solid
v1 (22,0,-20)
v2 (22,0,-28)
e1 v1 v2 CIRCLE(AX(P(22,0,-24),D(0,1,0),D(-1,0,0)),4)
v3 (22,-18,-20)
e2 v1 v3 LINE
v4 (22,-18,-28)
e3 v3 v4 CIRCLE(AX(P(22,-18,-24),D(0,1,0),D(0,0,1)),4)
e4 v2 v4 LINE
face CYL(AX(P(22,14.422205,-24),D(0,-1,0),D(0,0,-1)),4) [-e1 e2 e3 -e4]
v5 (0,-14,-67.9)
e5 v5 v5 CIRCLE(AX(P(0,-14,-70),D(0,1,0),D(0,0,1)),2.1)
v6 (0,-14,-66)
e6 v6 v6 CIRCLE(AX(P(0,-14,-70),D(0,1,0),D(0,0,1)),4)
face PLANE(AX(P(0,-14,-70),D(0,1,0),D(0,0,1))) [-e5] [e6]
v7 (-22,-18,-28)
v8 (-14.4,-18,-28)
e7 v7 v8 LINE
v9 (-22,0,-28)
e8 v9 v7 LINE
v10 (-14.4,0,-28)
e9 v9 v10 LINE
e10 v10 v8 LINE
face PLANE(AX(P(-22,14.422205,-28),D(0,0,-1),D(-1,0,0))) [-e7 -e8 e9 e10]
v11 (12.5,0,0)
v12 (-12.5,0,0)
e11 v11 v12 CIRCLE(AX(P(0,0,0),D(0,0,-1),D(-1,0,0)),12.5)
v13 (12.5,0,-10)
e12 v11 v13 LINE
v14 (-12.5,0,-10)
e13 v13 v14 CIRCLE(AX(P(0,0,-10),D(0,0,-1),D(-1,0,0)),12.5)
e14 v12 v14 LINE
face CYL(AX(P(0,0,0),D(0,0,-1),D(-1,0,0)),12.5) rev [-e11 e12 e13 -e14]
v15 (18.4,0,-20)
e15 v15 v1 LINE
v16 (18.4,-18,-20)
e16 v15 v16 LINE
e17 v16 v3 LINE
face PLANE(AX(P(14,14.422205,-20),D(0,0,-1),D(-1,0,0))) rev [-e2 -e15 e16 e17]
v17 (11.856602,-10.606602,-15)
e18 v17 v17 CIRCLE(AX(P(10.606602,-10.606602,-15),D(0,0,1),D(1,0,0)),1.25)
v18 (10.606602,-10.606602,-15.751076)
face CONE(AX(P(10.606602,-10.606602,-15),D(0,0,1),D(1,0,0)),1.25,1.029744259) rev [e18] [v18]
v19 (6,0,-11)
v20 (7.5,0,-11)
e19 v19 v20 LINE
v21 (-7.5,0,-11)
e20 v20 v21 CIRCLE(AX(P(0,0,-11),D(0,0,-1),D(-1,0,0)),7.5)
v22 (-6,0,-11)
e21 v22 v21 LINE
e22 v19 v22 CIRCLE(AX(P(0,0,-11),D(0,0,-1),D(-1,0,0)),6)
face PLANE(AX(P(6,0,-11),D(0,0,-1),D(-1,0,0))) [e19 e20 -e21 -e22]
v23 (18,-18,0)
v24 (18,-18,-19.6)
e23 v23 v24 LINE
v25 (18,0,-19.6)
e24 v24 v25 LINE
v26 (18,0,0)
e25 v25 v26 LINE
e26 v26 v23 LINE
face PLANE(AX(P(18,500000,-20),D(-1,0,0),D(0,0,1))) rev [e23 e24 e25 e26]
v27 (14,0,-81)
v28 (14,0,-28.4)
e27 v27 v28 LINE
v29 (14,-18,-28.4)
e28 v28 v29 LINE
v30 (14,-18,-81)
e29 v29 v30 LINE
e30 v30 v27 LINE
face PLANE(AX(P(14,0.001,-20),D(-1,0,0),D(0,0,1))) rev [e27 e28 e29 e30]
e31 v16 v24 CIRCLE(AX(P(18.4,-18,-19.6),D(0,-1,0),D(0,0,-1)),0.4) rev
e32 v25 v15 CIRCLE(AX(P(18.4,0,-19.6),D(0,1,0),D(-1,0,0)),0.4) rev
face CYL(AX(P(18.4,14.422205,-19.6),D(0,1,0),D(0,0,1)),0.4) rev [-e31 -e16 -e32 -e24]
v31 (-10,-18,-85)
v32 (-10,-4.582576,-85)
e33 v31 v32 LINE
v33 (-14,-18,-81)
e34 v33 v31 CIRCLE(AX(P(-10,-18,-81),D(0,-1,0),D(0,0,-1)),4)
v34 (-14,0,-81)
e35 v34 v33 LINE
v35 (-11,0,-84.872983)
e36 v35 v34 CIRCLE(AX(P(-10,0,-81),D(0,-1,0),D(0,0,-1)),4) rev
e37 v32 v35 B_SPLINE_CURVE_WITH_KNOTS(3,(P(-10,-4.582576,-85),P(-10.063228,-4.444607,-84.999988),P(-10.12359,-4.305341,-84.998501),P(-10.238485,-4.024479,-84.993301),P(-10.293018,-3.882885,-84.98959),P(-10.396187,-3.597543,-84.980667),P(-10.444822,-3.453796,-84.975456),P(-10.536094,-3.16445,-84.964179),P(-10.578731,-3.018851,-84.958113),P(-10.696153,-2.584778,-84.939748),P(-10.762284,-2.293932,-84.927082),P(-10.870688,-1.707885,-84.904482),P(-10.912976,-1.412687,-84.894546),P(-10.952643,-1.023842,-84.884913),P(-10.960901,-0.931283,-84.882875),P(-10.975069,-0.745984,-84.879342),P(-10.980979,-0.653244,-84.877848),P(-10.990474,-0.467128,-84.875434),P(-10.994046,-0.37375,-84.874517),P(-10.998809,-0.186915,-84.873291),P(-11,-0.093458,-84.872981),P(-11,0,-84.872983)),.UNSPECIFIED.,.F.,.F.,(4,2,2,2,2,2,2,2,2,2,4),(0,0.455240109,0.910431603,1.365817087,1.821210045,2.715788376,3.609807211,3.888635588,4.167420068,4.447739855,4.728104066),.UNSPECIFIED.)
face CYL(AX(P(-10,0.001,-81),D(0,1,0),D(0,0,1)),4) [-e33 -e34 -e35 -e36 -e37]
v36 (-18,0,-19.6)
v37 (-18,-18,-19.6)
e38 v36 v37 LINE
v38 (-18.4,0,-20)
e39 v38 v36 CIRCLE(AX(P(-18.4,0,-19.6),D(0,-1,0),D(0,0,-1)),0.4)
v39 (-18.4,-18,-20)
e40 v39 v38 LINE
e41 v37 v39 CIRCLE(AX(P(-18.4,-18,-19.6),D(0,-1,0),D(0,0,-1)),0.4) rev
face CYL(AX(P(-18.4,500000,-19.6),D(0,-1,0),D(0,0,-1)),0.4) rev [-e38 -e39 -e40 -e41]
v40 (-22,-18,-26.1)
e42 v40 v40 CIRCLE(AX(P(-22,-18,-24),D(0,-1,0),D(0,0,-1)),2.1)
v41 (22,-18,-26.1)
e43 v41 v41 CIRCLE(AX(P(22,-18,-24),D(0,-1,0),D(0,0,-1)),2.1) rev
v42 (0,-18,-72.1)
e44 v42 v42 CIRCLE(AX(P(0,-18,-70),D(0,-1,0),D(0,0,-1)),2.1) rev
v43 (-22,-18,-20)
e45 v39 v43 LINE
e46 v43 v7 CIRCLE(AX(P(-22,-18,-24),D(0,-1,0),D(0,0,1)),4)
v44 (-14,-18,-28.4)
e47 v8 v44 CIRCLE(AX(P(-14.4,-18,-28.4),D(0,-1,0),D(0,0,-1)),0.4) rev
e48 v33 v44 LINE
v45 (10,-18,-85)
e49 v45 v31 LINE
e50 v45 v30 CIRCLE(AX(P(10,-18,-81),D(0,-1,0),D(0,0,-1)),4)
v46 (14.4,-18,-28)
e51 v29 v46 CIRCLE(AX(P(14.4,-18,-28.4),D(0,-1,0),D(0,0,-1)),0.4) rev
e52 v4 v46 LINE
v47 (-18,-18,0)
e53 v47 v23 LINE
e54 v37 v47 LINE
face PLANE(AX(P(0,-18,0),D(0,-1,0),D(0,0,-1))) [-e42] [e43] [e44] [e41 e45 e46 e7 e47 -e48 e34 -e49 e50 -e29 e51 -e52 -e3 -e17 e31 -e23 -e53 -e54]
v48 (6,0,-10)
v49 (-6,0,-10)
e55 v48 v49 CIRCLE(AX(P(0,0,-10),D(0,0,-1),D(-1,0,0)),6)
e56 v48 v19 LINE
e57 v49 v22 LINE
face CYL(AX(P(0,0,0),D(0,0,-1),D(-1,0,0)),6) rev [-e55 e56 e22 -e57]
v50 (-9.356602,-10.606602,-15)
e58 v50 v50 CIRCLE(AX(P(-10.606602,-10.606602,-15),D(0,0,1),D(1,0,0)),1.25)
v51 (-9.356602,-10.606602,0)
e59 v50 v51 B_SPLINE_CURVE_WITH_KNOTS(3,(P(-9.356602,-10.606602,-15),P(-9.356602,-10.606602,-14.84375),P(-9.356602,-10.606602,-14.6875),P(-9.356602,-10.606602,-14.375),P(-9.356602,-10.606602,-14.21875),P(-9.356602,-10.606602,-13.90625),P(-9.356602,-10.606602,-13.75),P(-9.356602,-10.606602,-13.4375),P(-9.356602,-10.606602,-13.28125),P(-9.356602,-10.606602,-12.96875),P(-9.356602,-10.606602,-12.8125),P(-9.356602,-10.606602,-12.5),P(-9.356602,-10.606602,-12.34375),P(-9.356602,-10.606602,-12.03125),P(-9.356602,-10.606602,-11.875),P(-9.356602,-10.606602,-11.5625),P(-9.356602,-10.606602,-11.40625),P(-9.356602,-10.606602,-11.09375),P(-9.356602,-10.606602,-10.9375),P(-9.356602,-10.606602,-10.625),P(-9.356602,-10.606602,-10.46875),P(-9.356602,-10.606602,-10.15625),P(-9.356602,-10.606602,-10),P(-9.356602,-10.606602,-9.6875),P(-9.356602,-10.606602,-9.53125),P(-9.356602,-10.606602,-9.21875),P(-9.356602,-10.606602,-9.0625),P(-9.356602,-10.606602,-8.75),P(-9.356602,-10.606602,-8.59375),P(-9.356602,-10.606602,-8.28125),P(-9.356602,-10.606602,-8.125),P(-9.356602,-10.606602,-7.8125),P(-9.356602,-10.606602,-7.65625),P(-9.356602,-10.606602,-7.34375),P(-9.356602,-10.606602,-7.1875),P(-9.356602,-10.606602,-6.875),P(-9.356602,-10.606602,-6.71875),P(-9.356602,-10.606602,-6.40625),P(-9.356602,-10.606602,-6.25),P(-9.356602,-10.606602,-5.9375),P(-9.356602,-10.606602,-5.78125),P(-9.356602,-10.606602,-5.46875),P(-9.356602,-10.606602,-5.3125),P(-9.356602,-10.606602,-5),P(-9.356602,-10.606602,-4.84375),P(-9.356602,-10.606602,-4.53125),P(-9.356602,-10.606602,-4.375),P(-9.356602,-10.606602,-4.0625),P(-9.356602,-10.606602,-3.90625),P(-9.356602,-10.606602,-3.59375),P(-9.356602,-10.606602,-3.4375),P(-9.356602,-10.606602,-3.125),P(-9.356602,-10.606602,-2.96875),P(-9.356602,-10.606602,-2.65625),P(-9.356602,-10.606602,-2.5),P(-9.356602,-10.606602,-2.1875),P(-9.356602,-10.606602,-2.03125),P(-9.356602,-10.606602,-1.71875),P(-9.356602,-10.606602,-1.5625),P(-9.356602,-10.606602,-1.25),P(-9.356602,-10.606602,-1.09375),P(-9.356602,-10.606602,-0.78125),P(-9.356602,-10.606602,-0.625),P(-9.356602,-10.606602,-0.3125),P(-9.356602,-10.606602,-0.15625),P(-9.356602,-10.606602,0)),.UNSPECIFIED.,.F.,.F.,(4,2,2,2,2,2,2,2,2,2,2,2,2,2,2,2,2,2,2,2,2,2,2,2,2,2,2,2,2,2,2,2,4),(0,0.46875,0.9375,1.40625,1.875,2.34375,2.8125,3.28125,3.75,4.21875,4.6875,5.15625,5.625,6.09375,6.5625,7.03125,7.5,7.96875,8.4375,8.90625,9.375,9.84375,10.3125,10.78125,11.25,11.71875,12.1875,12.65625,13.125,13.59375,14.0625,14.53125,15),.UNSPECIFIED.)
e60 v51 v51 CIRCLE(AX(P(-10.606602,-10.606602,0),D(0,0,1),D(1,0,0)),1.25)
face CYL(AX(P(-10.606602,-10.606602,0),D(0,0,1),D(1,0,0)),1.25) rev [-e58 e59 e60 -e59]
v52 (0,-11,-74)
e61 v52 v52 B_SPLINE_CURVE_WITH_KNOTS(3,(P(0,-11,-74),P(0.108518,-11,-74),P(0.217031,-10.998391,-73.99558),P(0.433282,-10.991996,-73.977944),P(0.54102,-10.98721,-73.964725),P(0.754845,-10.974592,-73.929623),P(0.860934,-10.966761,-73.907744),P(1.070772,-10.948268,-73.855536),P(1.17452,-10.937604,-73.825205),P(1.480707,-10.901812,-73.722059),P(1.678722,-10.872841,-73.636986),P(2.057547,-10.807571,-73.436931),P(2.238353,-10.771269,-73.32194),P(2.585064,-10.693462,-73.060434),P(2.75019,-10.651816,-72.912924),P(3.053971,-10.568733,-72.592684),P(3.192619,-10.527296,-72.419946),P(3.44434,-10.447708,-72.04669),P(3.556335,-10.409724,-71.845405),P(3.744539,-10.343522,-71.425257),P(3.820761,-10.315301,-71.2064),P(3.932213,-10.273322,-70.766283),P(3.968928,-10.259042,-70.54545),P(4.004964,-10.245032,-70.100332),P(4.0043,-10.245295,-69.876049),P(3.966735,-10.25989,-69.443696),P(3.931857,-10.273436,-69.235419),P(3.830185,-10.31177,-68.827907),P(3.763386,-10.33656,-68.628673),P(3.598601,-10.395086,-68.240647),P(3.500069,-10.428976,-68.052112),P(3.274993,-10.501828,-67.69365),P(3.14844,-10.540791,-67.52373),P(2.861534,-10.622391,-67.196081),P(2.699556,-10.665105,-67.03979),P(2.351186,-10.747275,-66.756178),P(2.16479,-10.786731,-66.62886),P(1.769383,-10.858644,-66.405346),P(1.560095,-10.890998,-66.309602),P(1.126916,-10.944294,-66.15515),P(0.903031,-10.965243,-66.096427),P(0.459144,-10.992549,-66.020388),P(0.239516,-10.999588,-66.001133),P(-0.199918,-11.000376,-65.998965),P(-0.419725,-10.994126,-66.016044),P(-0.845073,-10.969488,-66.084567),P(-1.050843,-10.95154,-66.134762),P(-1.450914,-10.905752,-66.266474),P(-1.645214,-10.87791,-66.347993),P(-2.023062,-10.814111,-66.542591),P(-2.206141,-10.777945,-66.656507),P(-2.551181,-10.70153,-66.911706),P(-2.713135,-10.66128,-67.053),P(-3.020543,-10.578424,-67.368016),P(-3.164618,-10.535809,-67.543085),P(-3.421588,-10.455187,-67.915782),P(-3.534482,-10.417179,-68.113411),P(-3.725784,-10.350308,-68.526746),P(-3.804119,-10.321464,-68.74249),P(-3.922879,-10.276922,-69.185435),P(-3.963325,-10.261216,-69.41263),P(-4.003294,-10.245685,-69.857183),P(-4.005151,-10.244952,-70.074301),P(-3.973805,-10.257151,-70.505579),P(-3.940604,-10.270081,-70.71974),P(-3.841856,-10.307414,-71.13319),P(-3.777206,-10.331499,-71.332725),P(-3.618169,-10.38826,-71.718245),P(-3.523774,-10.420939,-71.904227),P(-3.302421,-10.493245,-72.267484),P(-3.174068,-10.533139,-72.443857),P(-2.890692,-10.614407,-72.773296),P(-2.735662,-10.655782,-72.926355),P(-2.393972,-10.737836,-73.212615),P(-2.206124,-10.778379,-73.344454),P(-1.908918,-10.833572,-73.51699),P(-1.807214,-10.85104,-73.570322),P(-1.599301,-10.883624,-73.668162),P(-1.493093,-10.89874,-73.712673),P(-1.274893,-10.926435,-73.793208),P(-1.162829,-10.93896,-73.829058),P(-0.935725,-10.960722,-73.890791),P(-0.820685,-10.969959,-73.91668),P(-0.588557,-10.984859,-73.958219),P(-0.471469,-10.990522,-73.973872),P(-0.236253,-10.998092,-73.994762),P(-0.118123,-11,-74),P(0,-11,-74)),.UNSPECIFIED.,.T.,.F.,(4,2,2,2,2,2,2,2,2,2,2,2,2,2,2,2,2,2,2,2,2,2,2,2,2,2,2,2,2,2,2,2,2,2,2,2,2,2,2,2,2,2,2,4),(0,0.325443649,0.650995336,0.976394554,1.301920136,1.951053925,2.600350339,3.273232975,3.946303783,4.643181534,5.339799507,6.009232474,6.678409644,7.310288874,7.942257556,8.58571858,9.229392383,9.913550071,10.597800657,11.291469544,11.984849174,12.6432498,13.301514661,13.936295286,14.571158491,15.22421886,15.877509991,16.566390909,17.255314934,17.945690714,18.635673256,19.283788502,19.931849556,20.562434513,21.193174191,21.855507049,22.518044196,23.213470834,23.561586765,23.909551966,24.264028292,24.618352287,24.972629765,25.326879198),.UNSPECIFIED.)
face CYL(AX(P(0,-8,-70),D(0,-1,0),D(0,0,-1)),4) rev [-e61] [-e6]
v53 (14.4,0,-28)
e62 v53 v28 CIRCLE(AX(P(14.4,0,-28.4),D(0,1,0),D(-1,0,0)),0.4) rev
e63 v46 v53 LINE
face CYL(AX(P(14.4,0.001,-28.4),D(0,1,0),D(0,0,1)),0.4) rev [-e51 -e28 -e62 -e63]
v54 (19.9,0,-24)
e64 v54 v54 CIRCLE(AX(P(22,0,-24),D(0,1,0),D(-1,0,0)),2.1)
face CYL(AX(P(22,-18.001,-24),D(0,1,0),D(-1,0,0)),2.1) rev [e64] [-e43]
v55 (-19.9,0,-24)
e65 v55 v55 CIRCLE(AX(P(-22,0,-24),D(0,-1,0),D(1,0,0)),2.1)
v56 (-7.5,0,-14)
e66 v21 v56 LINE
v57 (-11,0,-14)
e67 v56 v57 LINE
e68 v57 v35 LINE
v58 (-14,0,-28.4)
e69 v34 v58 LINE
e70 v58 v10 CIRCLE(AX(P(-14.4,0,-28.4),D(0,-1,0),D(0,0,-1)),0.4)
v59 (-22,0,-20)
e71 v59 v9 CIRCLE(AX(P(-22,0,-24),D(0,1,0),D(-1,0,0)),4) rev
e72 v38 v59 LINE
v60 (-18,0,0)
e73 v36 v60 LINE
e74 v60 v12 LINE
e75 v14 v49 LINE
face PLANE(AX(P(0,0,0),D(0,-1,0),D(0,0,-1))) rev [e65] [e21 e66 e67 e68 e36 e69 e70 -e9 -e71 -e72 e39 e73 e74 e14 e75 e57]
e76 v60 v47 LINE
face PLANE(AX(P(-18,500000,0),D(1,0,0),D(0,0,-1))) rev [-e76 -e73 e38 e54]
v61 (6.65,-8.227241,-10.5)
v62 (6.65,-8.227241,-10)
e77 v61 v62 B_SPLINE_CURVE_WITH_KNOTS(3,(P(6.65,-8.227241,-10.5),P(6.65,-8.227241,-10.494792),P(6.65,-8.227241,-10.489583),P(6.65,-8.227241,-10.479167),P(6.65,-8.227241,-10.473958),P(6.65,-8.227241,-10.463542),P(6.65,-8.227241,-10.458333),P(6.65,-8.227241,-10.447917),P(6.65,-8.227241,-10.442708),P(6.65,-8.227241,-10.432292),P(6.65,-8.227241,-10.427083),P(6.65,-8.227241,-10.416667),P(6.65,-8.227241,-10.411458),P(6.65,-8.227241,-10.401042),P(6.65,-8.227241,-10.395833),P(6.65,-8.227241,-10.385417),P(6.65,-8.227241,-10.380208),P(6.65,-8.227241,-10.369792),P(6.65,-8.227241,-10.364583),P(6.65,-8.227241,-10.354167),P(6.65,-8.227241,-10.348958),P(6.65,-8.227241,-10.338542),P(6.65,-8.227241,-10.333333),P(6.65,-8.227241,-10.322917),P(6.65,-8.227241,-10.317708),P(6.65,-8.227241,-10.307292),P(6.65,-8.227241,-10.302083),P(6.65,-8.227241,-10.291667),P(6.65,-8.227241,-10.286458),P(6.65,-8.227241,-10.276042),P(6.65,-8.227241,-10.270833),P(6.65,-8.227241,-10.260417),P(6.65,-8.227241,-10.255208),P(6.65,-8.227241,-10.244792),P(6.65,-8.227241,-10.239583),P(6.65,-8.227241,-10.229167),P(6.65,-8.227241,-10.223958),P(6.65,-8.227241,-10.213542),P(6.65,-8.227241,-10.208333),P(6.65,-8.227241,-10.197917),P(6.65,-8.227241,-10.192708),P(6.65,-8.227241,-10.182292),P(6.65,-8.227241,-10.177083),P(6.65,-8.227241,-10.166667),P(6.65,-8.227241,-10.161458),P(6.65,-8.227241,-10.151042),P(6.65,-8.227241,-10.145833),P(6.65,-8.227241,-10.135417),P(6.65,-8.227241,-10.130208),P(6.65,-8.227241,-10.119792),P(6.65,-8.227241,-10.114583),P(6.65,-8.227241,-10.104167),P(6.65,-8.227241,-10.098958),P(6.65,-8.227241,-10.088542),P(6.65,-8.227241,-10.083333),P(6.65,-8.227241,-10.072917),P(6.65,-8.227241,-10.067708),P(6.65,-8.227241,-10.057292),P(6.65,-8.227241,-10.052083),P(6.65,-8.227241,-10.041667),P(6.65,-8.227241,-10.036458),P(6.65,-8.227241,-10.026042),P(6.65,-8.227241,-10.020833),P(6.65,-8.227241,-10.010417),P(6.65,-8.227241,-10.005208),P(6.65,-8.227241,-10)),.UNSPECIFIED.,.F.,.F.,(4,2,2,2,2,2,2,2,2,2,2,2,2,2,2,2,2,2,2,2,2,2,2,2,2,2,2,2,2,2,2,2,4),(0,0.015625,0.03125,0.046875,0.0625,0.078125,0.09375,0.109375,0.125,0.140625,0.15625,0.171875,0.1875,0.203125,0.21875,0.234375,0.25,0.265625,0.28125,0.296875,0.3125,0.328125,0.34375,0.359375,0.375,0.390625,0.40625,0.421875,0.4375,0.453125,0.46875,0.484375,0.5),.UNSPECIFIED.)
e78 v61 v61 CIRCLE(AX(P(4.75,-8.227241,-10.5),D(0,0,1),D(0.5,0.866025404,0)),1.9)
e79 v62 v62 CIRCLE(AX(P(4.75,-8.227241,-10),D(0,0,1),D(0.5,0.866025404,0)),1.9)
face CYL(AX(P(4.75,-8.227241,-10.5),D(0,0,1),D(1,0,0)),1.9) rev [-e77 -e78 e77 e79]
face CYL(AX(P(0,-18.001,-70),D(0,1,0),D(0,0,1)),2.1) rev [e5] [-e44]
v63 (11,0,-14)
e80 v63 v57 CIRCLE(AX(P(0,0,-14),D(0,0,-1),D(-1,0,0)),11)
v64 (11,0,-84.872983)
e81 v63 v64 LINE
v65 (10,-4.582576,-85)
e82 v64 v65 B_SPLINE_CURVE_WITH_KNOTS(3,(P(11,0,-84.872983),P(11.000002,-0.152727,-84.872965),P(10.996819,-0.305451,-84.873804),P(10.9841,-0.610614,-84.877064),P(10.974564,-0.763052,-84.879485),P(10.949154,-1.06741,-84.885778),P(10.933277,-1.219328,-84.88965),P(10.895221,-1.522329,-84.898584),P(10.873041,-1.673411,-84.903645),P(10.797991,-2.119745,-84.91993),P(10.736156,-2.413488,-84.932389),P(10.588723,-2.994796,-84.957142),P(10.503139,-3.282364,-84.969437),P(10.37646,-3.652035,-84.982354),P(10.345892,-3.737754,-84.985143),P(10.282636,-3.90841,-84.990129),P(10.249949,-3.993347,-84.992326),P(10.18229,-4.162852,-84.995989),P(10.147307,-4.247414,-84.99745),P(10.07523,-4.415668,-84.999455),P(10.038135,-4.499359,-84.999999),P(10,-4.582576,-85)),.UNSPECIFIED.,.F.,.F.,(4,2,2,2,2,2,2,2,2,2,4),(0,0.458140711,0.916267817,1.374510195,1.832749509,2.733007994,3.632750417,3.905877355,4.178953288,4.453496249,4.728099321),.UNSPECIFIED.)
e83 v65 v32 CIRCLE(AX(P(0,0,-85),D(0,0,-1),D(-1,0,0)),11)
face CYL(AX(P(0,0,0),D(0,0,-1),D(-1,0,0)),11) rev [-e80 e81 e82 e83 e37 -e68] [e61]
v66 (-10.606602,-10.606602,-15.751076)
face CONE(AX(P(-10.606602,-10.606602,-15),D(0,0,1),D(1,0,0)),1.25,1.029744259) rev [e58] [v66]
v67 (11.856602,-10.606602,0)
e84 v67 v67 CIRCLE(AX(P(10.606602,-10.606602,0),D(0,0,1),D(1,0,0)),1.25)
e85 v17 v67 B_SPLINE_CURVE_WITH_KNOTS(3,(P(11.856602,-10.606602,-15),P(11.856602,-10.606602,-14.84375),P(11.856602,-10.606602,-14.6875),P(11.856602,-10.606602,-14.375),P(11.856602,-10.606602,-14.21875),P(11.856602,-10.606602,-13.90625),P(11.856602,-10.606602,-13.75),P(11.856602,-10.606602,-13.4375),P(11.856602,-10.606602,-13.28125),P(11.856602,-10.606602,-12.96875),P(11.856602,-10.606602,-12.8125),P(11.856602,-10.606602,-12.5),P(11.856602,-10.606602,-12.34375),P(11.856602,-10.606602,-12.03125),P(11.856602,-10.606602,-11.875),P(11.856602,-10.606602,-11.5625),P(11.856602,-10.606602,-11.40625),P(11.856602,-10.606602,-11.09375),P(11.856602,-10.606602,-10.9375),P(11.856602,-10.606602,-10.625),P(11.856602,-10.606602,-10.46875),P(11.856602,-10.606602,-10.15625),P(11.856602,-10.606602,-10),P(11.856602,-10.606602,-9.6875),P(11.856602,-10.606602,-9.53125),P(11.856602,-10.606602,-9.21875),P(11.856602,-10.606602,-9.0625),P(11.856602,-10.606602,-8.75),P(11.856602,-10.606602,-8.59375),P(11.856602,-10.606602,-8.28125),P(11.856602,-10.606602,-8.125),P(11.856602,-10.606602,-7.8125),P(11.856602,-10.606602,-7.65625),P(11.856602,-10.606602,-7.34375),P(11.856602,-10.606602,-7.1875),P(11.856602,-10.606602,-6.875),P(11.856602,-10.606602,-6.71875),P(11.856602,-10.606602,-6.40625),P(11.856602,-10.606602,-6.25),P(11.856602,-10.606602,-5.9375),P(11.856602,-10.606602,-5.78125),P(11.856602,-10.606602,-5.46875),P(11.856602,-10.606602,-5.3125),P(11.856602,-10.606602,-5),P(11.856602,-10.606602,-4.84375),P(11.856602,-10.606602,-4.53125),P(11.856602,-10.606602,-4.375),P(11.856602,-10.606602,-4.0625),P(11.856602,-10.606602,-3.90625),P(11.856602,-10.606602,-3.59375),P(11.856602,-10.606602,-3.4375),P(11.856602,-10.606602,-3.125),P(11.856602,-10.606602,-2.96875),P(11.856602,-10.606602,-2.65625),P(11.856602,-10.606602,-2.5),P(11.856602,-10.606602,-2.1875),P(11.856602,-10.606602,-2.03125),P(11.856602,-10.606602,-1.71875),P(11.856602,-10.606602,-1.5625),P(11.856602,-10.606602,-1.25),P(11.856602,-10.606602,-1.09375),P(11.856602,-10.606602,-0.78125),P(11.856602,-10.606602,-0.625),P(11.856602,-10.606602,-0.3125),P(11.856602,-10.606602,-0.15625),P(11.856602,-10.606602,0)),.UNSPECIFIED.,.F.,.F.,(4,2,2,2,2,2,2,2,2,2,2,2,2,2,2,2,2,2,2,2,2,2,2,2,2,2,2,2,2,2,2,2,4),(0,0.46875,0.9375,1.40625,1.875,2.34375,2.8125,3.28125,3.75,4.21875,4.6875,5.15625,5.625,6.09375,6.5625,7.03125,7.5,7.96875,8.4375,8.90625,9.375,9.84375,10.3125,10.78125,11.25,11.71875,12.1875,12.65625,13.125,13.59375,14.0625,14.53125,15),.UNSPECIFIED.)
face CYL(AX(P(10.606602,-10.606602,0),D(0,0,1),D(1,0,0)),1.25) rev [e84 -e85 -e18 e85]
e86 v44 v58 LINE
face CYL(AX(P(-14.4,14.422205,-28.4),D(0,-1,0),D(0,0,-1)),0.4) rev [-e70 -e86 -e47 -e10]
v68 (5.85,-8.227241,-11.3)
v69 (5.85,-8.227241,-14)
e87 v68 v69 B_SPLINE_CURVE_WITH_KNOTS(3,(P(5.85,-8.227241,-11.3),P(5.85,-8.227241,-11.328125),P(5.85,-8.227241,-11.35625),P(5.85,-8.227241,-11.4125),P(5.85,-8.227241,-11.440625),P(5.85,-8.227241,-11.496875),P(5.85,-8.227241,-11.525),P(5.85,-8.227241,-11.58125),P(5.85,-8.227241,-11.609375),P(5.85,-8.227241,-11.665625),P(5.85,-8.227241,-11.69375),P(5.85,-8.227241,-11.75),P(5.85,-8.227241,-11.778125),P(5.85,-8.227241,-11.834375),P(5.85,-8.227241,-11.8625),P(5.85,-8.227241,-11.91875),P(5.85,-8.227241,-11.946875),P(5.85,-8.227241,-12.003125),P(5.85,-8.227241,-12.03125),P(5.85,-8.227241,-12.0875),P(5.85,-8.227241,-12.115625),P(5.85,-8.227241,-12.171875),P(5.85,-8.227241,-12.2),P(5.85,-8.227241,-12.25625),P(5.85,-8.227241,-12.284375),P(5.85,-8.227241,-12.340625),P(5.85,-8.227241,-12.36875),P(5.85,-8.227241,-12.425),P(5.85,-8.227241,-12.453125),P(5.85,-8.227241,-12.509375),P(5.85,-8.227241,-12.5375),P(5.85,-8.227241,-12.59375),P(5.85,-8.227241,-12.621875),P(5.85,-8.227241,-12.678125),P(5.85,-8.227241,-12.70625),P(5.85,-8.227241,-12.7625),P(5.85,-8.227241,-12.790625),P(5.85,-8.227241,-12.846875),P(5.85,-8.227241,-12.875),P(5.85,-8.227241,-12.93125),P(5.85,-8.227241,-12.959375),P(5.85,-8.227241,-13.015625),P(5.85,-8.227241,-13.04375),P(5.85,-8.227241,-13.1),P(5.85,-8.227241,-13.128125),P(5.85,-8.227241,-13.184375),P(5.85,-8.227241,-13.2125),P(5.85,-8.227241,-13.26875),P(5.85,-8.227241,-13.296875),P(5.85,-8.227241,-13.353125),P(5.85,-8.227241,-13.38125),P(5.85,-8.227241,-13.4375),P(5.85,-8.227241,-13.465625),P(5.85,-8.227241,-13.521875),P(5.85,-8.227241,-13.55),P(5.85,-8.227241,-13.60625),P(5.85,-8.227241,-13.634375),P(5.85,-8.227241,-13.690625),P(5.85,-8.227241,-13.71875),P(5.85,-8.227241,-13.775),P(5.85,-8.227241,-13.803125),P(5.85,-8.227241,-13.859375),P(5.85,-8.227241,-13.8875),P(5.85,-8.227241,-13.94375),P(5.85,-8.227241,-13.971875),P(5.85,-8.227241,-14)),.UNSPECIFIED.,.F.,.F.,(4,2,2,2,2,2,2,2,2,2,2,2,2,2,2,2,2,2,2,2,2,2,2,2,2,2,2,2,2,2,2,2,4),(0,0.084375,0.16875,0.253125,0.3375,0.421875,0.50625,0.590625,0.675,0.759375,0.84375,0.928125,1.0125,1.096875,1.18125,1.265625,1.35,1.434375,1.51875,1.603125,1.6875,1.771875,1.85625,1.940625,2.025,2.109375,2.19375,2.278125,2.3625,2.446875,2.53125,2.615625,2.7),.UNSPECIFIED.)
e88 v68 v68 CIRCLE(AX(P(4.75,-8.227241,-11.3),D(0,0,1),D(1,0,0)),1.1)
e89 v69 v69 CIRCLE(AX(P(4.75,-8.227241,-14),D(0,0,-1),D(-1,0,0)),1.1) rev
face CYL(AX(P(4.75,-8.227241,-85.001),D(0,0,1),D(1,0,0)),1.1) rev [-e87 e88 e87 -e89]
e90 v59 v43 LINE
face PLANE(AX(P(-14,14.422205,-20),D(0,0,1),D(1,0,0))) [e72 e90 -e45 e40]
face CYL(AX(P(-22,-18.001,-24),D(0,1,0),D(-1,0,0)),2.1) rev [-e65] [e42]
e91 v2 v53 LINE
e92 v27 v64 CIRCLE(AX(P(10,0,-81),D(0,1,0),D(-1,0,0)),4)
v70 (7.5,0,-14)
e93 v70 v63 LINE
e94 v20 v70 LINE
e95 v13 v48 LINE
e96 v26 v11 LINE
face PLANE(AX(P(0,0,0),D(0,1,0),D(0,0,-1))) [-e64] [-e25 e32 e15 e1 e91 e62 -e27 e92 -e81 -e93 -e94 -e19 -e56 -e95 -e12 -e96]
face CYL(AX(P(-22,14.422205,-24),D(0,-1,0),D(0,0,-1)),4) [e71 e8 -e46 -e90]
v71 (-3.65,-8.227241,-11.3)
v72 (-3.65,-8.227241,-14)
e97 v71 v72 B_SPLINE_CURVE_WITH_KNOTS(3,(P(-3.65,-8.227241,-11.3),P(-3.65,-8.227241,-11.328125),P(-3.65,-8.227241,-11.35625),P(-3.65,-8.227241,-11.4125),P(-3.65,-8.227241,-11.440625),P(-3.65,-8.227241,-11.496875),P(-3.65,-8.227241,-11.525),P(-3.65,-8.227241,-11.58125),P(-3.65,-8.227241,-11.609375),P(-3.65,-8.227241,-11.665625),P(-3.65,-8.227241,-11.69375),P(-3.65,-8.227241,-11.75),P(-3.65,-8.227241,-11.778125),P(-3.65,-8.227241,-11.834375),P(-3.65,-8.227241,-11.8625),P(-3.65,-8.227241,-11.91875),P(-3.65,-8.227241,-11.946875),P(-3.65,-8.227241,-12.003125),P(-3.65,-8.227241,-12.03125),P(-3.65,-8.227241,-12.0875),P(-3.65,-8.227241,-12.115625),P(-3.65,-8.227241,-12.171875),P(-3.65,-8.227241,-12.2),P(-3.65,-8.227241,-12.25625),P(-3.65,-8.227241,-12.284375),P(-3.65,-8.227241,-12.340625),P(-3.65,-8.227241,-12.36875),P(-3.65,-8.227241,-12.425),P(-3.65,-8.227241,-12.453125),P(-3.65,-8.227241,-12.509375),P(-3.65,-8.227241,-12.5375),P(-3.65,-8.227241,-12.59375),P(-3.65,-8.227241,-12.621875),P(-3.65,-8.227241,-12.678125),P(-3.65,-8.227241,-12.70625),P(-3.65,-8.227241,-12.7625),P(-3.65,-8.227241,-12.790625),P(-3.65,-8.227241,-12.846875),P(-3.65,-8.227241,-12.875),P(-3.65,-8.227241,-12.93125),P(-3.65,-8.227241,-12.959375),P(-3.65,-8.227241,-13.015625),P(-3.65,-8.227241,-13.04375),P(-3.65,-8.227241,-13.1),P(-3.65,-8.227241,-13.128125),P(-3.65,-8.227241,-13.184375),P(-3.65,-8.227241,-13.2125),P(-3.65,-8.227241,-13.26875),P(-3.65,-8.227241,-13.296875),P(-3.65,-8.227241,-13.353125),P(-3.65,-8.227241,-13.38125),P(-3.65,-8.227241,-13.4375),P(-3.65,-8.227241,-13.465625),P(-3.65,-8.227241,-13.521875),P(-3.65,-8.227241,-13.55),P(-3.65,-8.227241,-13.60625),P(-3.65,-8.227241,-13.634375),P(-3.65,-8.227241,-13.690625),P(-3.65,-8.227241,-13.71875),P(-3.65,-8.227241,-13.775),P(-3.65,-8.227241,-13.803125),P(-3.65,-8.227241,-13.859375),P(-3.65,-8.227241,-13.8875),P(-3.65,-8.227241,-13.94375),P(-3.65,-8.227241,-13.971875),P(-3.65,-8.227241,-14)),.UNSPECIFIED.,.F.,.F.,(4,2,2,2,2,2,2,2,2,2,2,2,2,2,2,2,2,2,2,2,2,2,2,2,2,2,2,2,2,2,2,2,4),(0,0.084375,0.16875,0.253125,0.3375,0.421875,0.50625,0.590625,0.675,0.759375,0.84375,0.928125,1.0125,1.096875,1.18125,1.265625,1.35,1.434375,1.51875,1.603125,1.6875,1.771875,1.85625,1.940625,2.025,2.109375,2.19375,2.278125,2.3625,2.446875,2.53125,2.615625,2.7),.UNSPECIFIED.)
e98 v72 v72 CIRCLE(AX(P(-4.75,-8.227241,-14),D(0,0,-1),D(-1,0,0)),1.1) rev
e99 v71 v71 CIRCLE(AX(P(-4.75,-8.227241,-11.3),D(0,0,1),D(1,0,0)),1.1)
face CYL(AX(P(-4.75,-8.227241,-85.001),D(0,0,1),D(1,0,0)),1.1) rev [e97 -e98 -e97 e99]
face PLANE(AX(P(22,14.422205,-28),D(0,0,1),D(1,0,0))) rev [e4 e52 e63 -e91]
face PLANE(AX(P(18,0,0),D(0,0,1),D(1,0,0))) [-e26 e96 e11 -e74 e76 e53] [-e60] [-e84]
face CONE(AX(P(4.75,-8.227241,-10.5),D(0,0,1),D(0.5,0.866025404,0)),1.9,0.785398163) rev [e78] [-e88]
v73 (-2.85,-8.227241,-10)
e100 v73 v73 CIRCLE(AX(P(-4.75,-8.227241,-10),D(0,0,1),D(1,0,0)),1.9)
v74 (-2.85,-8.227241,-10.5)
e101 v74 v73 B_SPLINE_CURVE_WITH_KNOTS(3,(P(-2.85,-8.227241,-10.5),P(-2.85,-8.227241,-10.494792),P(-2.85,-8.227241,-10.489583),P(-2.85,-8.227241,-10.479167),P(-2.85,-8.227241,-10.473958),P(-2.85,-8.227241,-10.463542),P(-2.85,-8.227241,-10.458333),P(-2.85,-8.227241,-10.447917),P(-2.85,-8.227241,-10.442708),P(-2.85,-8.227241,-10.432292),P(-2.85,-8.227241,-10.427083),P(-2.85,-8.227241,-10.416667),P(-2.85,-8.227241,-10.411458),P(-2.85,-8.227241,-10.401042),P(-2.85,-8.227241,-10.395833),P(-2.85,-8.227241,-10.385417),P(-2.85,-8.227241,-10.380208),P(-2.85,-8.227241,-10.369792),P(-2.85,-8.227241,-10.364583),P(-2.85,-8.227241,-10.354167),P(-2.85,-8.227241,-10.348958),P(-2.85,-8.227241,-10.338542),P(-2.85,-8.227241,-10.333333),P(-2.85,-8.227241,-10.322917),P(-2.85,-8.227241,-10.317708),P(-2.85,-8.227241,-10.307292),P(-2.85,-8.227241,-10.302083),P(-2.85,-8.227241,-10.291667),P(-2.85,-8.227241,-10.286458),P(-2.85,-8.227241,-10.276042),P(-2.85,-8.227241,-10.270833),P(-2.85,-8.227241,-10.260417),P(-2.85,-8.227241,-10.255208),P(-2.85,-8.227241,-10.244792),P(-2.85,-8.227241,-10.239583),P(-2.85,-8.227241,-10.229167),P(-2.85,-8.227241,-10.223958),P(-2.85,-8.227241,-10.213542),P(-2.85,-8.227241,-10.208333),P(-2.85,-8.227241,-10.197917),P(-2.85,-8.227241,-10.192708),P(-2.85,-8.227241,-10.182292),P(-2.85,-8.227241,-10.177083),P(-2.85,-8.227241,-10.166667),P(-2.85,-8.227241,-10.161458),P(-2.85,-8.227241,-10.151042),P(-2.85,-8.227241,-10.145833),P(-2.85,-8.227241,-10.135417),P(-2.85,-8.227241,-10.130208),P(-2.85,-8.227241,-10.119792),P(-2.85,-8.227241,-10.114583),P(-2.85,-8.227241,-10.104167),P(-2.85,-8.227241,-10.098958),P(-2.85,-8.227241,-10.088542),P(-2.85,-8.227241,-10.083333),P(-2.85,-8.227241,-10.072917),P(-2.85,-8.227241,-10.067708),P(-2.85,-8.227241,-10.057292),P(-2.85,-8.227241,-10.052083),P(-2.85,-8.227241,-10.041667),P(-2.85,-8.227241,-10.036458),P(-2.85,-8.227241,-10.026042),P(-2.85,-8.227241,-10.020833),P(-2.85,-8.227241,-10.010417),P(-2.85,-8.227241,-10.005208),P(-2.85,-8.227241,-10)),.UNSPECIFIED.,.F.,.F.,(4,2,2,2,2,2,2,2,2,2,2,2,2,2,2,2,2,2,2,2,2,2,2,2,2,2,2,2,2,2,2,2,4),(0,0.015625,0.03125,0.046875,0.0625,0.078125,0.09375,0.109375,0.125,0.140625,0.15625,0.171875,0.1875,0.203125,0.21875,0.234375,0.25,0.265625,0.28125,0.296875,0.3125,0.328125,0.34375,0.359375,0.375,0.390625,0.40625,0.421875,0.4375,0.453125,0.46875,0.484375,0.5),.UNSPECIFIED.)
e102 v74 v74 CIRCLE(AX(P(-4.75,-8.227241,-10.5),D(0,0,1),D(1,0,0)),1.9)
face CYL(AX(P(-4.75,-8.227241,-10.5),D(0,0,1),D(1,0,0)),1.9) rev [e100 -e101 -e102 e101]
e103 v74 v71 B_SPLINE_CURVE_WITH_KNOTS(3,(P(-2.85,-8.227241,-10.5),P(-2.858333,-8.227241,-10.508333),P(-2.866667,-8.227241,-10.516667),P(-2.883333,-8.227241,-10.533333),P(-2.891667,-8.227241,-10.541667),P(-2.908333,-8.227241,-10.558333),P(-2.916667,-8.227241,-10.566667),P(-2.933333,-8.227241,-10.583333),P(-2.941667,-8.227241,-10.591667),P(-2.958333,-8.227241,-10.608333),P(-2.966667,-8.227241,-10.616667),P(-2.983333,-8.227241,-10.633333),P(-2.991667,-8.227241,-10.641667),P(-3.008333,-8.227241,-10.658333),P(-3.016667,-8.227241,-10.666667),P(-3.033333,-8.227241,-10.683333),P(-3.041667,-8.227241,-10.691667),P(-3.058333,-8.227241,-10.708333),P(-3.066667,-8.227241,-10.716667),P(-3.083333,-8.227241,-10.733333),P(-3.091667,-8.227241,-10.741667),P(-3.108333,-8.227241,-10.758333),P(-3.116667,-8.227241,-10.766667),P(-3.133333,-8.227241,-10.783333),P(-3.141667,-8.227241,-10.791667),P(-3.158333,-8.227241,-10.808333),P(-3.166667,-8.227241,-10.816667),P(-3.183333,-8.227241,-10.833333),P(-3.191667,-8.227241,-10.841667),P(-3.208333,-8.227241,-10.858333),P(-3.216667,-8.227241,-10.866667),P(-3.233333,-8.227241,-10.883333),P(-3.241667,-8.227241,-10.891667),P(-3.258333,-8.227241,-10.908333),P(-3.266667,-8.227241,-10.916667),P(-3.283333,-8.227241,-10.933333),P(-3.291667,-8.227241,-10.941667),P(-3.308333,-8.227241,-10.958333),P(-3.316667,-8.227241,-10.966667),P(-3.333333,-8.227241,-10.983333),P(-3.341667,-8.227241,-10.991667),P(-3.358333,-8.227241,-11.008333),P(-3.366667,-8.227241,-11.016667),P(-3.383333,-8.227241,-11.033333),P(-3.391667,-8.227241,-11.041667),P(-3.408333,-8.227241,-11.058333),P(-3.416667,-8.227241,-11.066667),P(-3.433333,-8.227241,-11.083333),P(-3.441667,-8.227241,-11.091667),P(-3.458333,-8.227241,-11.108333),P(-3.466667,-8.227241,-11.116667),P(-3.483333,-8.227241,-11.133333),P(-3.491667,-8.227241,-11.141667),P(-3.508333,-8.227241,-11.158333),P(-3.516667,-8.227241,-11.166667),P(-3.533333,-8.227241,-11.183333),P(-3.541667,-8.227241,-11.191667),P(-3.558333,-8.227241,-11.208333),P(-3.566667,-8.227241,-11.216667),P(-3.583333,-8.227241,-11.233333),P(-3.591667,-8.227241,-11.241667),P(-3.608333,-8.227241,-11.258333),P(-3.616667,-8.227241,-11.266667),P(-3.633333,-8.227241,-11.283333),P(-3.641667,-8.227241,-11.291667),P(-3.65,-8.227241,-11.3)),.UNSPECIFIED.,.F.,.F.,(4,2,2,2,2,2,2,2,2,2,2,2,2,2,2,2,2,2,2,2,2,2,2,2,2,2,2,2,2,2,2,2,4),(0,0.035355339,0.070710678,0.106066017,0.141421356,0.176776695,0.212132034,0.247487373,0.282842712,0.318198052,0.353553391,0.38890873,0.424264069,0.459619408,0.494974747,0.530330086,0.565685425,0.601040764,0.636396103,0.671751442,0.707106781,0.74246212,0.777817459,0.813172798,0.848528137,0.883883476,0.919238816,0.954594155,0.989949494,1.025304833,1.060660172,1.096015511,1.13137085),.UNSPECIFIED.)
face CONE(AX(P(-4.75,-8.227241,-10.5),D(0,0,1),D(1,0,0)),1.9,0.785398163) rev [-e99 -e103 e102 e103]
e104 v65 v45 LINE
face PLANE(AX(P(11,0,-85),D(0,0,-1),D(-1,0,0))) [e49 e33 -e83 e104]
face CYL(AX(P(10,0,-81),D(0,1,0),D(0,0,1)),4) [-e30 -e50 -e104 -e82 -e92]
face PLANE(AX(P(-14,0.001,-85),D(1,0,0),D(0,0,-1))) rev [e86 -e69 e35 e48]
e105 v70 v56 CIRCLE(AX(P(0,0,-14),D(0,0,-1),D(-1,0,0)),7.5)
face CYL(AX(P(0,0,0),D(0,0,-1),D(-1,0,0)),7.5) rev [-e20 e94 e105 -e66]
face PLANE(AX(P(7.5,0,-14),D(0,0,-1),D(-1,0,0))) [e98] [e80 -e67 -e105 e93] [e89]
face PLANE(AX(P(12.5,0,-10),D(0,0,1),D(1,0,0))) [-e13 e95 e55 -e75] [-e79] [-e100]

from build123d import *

# Parameters (mm, degrees)
REVOLVE_1_ANGLE                    = 180
EXTRUDE_START                      = -20
EXTRUDE_1_DEPTH                    = 20
EXTRUDE_2_REACH                    = 90.73
SKETCH_3_W                         = 28
SKETCH_3_H                         = 65
CUT_EXTRUDE_1_DEPTH                = 3
CUT_EXTRUDE_1_DEPTH_BACK           = 3
SKETCH_4_R                         = 4
CUT_EXTRUDE_2_REACH                = 90.006
SKETCH_5_R                         = 2.1
EXTRUDE_3_DEPTH                    = 18
CUT_EXTRUDE_3_REACH                = 92.692
SKETCH_7_R                         = 2.1
CUT_EXTRUDE_4_REACH                = 83.394
SKETCH_8_R                         = 1.1
SKETCH_9_R                         = 1.9
CUT_EXTRUDE_5_DEPTH                = 0.5
SKETCH_10_R                        = 1.9
CUT_EXTRUDE_6_DEPTH                = 1.2
CUT_EXTRUDE_6_DRAFT                = -45
PATTERN_CIRCULAR_1_COUNT           = 2
PATTERN_CIRCULAR_1_ANGLE           = 60
PATTERN_CIRCULAR_1_COPY_1_SKETCH_R = 1.9
PATTERN_CIRCULAR_1_COPY_1_DEPTH    = 1.2
PATTERN_CIRCULAR_1_COPY_1_DRAFT    = -45
HOLE_WIZARD_M31_AT_2_COUNT         = 2
HOLE_WIZARD_M31_AT_2_PITCH         = 15
PATTERN_CIRCULAR_2_COUNT           = 2
PATTERN_CIRCULAR_2_ANGLE           = 90
FILLET_1_R                         = 0.4
FILLET_2_R                         = 4


# Read off the part's stored shape, not the designer's step: Бобышка-Вытянуть1
with BuildPart() as part:
    # Эскиз1 → Повернуть1 (revolve)
    with BuildSketch(Plane(origin=(0, 0, 0), x_dir=(1, 0, 0), z_dir=(0, 1, 0))):
        Polygon((-11, 85), (-14, 85), (-14, 20), (-18, 20), (-18, 0), (-12.5, 0), (-12.5, 10), (-6, 10), (-6, 11), (-7.5, 11), (-7.5, 14), (-11, 14), align=None)
    revolve(axis=Axis((0, 0, 0), (0, 0, 1)), revolution_arc=REVOLVE_1_ANGLE)

    # Бобышка-Вытянуть1 outline → Бобышка-Вытянуть1 (add)
    with BuildSketch(Plane.XY.offset(EXTRUDE_START)):
        with BuildLine():
            Line((-18, -18), (0, -18))
            ThreePointArc((0, -18), (-12.727922061, -12.727922061), (-18, 0))
            Line((-18, 0), (-18, -18))
        make_face()
        with BuildLine():
            Line((18, -18), (18, 0))
            ThreePointArc((18, 0), (12.727922061, -12.727922061), (0, -18))
            Line((0, -18), (18, -18))
        make_face()
    extrude(amount=EXTRUDE_1_DEPTH)

    # Эскиз3 → Бобышка-Вытянуть2 (add, up to next)
    with BuildSketch(Plane(origin=(0, -18, 0), x_dir=(1, 0, 0), z_dir=(0, 1, 0)), mode=Mode.PRIVATE) as extrude_2_sk1:
        with Locations((0, 52.5)):
            Rectangle(SKETCH_3_W, SKETCH_3_H)
    extrude_2_tool1 = extrude(extrude_2_sk1.sketch, amount=EXTRUDE_2_REACH, mode=Mode.PRIVATE) - part.part
    add(extrude_2_tool1.solids().sort_by_distance((0, -18, -52.5))[0])

    # Эскиз4 → Вырез-Вытянуть1 (cut, two sides: drawn at the far end of the back side and taken through both)
    with BuildSketch(Plane(origin=(0, -11, 0), x_dir=(1, 0, 0), z_dir=(0, 1, 0)).offset(-CUT_EXTRUDE_1_DEPTH_BACK)):
        with Locations(Location((0, 70, 0), (0, 0, 90))):
            Circle(SKETCH_4_R)
    extrude(amount=CUT_EXTRUDE_1_DEPTH + CUT_EXTRUDE_1_DEPTH_BACK, mode=Mode.SUBTRACT)

    # Эскиз5 → Вырез-Вытянуть2 (cut, up to next)
    with BuildSketch(Plane(origin=(0, -14, 0), x_dir=(1, 0, 0), z_dir=(0, 1, 0)), mode=Mode.PRIVATE) as cut_extrude_2_sk1:
        with Locations(Location((0, 70, 0), (0, 0, 270))):
            Circle(SKETCH_5_R)
    cut_extrude_2_tool1 = extrude(cut_extrude_2_sk1.sketch, amount=-CUT_EXTRUDE_2_REACH, mode=Mode.PRIVATE) & part.part
    add(cut_extrude_2_tool1.solids().sort_by_distance((0, -14, -70))[0], mode=Mode.SUBTRACT)

    # Эскиз6 → Бобышка-Вытянуть3 (add)
    with BuildSketch(Plane(origin=(0, -18, 0), x_dir=(1, 0, 0), z_dir=(0, 1, 0))):
        with BuildLine():
            Line((14, 20), (22, 20))
            ThreePointArc((22, 20), (26, 24), (22, 28))
            Line((22, 28), (14, 28))
            Line((14, 28), (14, 20))
        make_face()
    extrude_3 = extrude(amount=EXTRUDE_3_DEPTH)

    # Эскиз7 → Вырез-Вытянуть3 (cut, up to next)
    with BuildSketch(Plane(origin=(0, 0, 0), x_dir=(1, 0, 0), z_dir=(0, 1, 0)), mode=Mode.PRIVATE) as cut_extrude_3_sk1:
        with Locations(Location((22, 24, 0), (0, 0, 180))):
            Circle(SKETCH_7_R)
    cut_extrude_3_tool1 = extrude(cut_extrude_3_sk1.sketch, amount=-CUT_EXTRUDE_3_REACH, mode=Mode.PRIVATE) & part.part
    cut_extrude_3 = cut_extrude_3_tool1.solids().sort_by_distance((22, 0, -24))[0]
    add(cut_extrude_3, mode=Mode.SUBTRACT)

    # Зеркальное отражение1: Бобышка-Вытянуть3, Вырез-Вытянуть3 across plane
    add(extrude_3.mirror(Plane(origin=(0, 0, 0), x_dir=(0, 0, 1), z_dir=(1, 0, 0))))
    add(cut_extrude_3.mirror(Plane(origin=(0, 0, 0), x_dir=(0, 0, 1), z_dir=(1, 0, 0))), mode=Mode.SUBTRACT)

    # Эскиз8 → Вырез-Вытянуть4 (cut, up to next)
    with BuildSketch(Plane.XY.offset(-10), mode=Mode.PRIVATE) as cut_extrude_4_sk1:
        with Locations((-4.75, -8.227241336)):
            Circle(SKETCH_8_R)
    cut_extrude_4_tool1 = extrude(cut_extrude_4_sk1.sketch, amount=-CUT_EXTRUDE_4_REACH, mode=Mode.PRIVATE) & part.part
    cut_extrude_4 = cut_extrude_4_tool1.solids().sort_by_distance((-4.75, -8.227241, -10))[0]
    add(cut_extrude_4, mode=Mode.SUBTRACT)

    # Эскиз9 → Вырез-Вытянуть5 (cut)
    with BuildSketch(Plane.XY.offset(-10)):
        with Locations((-4.75, -8.227241336)):
            Circle(SKETCH_9_R)
    cut_extrude_5 = extrude(amount=-CUT_EXTRUDE_5_DEPTH, mode=Mode.SUBTRACT)


with BuildPart() as cut_extrude_6_tool:
    # Эскиз10 → Вырез-Вытянуть6 (with draft: the straight prism first)
    with BuildSketch(Plane.XY.offset(-10.5)):
        with Locations((-4.75, -8.227241336)):
            Circle(SKETCH_10_R)
    extrude(amount=-CUT_EXTRUDE_6_DEPTH)
    # Вырез-Вытянуть6: the draft: its side faces are tilted about the plane it starts from
    cut_extrude_6_sides = [cut_extrude_6_tool.faces().sort_by_distance(p)[0] for p in [
        (-6.65, -8.227241336, -11.1),
    ]]
    draft(cut_extrude_6_sides, Plane.XY.offset(-10.5), CUT_EXTRUDE_6_DRAFT)


with BuildPart() as part_1:
    add(part.part)

    # Вырез-Вытянуть6: cut by cut_extrude_6_tool
    add(cut_extrude_6_tool.part, mode=Mode.SUBTRACT)

    # Круговой массив1: Вырез-Вытянуть4, Вырез-Вытянуть5 ×2 about axis
    pattern_circular_1_axis = Axis((0, 0, 0), (0, 0, 1))
    add([cut_extrude_4.rotate(pattern_circular_1_axis, i * PATTERN_CIRCULAR_1_ANGLE / (PATTERN_CIRCULAR_1_COUNT - 1)) for i in range(1, PATTERN_CIRCULAR_1_COUNT)], mode=Mode.SUBTRACT)
    add([cut_extrude_5.rotate(pattern_circular_1_axis, i * PATTERN_CIRCULAR_1_ANGLE / (PATTERN_CIRCULAR_1_COUNT - 1)) for i in range(1, PATTERN_CIRCULAR_1_COUNT)], mode=Mode.SUBTRACT)


with BuildPart() as pattern_circular_1_copy_1_tool:
    # Круговой массив1 copy 1 sketch → Круговой массив1 copy 1 (with draft: the straight prism first)
    with BuildSketch(Plane(origin=(0, 0, -10.5), x_dir=(0.4999999999999978, 0.8660254037844399, 0), z_dir=(0, 0, 1))):
        with Locations((-4.75, -8.227241336)):
            Circle(PATTERN_CIRCULAR_1_COPY_1_SKETCH_R)
    extrude(amount=-PATTERN_CIRCULAR_1_COPY_1_DEPTH)
    # Круговой массив1 copy 1: the draft: its side faces are tilted about the plane it starts from
    pattern_circular_1_copy_1_sides = [pattern_circular_1_copy_1_tool.faces().sort_by_distance(p)[0] for p in [
        (3.8, -9.872689603, -11.1),
    ]]
    draft(pattern_circular_1_copy_1_sides, Plane(origin=(0, 0, -10.5), x_dir=(0.4999999999999978, 0.8660254037844399, 0), z_dir=(0, 0, 1)), PATTERN_CIRCULAR_1_COPY_1_DRAFT)


with BuildPart() as part_2:
    add(part_1.part)

    # Круговой массив1 copy 1: cut by pattern_circular_1_copy_1_tool
    add(pattern_circular_1_copy_1_tool.part, mode=Mode.SUBTRACT)

    # Эскиз11 → Сверление под метчик M31 (revolve, cut)
    with BuildSketch(Plane(origin=(10.606601718, -10.606601718, 0), x_dir=(0, -1, 0), z_dir=(1, 0, 0))):
        Polygon((0, 0), (0, 15.751075774), (1.25, 15), (1.25, 0), align=None)
    hole_wizard_m31 = revolve(axis=Axis((10.606601718, -10.606601718, 6.35), (0, 0, -1)), mode=Mode.SUBTRACT)

    # Сверление под метчик M31 at 2: Сверление под метчик M31 ×2
    with Locations(*[Vector(-0.7071067811865464, 0.7071067811865487, 0) * (i * HOLE_WIZARD_M31_AT_2_PITCH) for i in range(1, HOLE_WIZARD_M31_AT_2_COUNT)]):
        add(hole_wizard_m31, mode=Mode.SUBTRACT)

    # Круговой массив2: Сверление под метчик M31 ×2 about axis
    pattern_circular_2_axis = Axis((0, 0, 0), (0, 0, -1))
    for i in range(1, PATTERN_CIRCULAR_2_COUNT):
        add(hole_wizard_m31.rotate(pattern_circular_2_axis, i * PATTERN_CIRCULAR_2_ANGLE / (PATTERN_CIRCULAR_2_COUNT - 1)), mode=Mode.SUBTRACT)

    # Круговой массив2 copy 1 sketch → Круговой массив2 copy 1 (revolve, cut)
    with BuildSketch(Plane(origin=(0, 0, 0), x_dir=(-1, 0, 0), z_dir=(0, -1, 0))):
        Polygon((0, 0), (0, 15.751075774), (1.25, 15), (1.25, 0), align=None)
    revolve(axis=Axis((0, 0, 6.35), (0, 0, -1)), mode=Mode.SUBTRACT)

    # Скругление1
    fillet_1_edges = [part_2.edges().sort_by_distance(p)[0] for p in [
        (18, -9, -20),
        (-18, -9, -20),
        (14, -9, -28),
        (-14, -9, -28),
    ]]
    fillet(fillet_1_edges, radius=FILLET_1_R)

    # Скругление2
    fillet_2_edges = [part_2.edges().sort_by_distance(p)[0] for p in [
        (-14, -9, -85),
        (14, -9, -85),
    ]]
    fillet(fillet_2_edges, radius=FILLET_2_R)


solid = part_2.part
